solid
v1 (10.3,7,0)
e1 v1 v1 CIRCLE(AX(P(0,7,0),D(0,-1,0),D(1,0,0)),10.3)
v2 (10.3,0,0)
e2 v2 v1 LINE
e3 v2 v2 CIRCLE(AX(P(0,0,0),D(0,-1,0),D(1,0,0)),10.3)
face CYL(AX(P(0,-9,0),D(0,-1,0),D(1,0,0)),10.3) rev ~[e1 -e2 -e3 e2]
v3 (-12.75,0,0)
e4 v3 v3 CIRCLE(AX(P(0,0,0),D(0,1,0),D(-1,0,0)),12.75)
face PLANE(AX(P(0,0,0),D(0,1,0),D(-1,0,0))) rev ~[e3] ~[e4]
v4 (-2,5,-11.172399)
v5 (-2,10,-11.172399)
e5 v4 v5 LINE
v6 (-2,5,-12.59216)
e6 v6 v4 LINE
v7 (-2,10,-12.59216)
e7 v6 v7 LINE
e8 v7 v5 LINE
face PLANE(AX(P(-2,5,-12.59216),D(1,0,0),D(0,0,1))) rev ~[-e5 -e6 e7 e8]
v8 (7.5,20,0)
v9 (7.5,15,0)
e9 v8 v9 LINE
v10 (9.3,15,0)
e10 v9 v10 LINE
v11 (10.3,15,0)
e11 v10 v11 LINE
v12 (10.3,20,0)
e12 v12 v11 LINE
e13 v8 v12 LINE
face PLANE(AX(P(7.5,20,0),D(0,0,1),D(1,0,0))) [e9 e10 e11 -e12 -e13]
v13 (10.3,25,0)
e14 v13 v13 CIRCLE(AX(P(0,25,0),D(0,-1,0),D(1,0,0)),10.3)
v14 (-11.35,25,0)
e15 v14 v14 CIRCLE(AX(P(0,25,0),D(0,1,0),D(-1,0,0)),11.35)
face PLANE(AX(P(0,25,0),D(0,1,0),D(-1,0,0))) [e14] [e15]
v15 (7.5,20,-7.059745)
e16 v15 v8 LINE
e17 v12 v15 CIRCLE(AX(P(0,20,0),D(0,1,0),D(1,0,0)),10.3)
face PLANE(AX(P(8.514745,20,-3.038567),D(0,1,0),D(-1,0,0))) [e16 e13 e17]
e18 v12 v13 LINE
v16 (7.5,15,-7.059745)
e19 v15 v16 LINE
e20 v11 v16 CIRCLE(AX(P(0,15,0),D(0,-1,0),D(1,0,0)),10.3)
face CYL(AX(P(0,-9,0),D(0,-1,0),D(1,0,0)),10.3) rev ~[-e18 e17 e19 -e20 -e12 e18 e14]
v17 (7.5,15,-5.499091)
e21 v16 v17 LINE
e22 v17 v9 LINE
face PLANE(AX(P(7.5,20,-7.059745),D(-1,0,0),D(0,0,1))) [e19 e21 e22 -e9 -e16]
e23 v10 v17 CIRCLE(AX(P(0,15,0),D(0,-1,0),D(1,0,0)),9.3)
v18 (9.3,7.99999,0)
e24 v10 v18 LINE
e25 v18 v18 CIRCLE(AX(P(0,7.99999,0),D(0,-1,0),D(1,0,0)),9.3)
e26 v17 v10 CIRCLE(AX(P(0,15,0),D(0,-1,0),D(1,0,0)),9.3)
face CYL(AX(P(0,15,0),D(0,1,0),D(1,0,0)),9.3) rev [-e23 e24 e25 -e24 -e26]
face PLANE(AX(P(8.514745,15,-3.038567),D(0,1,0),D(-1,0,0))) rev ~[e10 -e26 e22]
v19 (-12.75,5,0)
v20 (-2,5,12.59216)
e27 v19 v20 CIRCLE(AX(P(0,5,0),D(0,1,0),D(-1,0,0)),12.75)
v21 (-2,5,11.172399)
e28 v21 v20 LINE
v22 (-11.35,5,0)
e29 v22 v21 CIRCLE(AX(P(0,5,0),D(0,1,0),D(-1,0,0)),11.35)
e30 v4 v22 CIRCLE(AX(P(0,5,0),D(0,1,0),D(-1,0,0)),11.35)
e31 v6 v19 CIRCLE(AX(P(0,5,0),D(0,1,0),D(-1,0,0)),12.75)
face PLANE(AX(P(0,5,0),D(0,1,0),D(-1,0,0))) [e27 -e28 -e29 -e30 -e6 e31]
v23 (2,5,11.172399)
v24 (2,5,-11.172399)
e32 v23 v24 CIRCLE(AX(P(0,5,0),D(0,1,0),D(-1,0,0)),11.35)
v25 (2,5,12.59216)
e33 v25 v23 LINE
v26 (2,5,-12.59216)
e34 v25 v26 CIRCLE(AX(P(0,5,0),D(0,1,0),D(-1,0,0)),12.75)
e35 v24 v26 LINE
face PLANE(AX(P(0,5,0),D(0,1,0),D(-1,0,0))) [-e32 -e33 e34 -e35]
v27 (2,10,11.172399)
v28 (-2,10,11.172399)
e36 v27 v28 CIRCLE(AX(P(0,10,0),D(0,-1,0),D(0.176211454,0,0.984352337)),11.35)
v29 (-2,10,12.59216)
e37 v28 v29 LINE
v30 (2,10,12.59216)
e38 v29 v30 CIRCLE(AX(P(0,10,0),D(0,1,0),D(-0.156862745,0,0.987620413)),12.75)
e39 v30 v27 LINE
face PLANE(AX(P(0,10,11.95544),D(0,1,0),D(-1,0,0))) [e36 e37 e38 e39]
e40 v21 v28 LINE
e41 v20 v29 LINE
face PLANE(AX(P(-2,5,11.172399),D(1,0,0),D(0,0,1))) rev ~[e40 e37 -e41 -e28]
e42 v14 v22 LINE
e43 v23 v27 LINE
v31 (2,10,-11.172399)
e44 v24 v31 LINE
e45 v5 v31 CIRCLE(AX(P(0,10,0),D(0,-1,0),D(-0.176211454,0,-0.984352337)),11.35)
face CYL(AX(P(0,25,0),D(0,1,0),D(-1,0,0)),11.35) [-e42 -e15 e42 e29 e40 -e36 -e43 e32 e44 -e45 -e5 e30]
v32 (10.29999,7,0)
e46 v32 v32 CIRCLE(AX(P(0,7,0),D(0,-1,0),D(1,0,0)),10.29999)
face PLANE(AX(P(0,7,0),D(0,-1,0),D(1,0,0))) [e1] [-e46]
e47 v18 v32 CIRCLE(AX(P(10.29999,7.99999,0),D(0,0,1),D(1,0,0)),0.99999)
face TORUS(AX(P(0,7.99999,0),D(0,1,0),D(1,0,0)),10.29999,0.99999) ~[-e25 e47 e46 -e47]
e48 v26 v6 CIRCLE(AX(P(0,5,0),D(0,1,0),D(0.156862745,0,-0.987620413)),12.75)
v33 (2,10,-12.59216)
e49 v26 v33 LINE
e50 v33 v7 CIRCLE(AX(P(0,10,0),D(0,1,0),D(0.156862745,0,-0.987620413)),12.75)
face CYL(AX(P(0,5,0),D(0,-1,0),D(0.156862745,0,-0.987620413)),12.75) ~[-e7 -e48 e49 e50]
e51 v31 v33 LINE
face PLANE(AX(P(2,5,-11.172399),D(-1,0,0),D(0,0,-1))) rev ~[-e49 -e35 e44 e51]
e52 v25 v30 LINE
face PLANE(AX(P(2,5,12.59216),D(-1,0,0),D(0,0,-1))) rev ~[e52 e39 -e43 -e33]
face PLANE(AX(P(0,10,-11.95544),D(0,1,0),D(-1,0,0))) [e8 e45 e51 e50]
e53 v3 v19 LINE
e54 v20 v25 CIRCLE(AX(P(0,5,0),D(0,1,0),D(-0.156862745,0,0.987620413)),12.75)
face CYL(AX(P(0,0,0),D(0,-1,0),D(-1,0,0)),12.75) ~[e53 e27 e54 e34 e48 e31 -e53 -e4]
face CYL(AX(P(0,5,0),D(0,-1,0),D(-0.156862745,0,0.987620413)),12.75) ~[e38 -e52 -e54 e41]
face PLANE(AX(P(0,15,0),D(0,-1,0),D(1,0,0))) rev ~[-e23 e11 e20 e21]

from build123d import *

# Parameters (mm, degrees)
F0_R         = 10.3
F1_DEPTH     = 9
F3_R         = 3.1
F4_DEPTH     = 9.001
F6_DEPTH     = 1.8
F7_T4_ANGLE  = 359.64
F7_S5_R      = 3.1
F7_T6_DEPTH  = 5
F7_T10_ANGLE = 359.64
F7_S11_R     = 3.1
F7_T12_DEPTH = 5
F7_T16_ANGLE = 359.64
F7_S17_R     = 3.1
F7_T18_DEPTH = 5
F9_R         = 12.75
F10_DEPTH    = 25
F11_R        = 3.1
F12_DEPTH    = 34.0010001
F13_R        = 12.75
F13_R_2      = 11.35
F14_DEPTH    = 20
F16_DEPTH    = 5
F17_R        = 10.3
F18_DEPTH    = 34.0010001
F20_START    = -5
F20_DEPTH    = 5
F21_R        = 10.3
F21_R_2      = 9.3
F22_DEPTH    = 8
F23_R        = 0.99999


# Not quite as in the source:
# - a fillet or chamfer that OpenCascade refuses, or shapes differently, is made with other operations: its cross-section is extruded or revolved along the edge and cut away or added
# - a fillet or chamfer is up to 0.001 mm smaller than in the source, because OpenCascade refuses the exact size


with BuildPart() as f1:
    # F0 (on Front) → F1 (new body)
    with BuildSketch(Plane.XZ):
        Circle(F0_R)
    extrude(amount=F1_DEPTH)

    # F3 (on face) → F4 (cut, through all)
    with BuildSketch(Plane.XZ.offset(9)):
        Circle(F3_R)
    extrude(amount=-F4_DEPTH, mode=Mode.SUBTRACT)

    # F5 (on face) → F6 (cut)
    with BuildSketch(Plane.XZ.offset(9)):
        with BuildLine():
            ThreePointArc((-3.0819681678, 0.333874546), (-2.6846787517, 1.55), (-1.8301279224, 2.502125454))
            ThreePointArc((-1.8301279224, 2.502125454), (-6.4951905284, 3.75), (-3.0819681678, 0.333874546))
        make_face()
        with BuildLine():
            ThreePointArc((6.8301270189, 2.5), (4.331189746, 4.9999997741), (1.8301279224, 2.502125454))
            ThreePointArc((1.8301279224, 2.502125454), (2.6846787517, 1.55), (3.0819681678, 0.333874546))
            ThreePointArc((3.0819681678, 0.333874546), (5.5810472546, 0.3354680497), (6.8301270189, 2.5))
        make_face()
        with BuildLine():
            ThreePointArc((1.2518402454, -2.836), (0, -3.1), (-1.2518402454, -2.836))
            ThreePointArc((-1.2518402454, -2.836), (-1.2490795384, -7.1655946774), (2.5, -5))
            ThreePointArc((2.5, -5), (2.1655946774, -3.7509204616), (1.2518402454, -2.836))
        make_face()
    extrude(amount=-F6_DEPTH, mode=Mode.SUBTRACT)

    # F7: fillet of radius 1 on 3 edges, made by hand


with BuildPart() as f7_tool2:
    # F7_s3 → F7_t4 (revolve)
    with BuildSketch(Plane(origin=(0.0078111935, 0, 0.0136280797), x_dir=(0, 1, 0), z_dir=(-0.497276838, 0, -0.8675919239))):
        with BuildLine():
            ThreePointArc((-8.2, -2.499975326), (-7.4928932188, -2.7928685448), (-7.2, -3.499975326))
            Line((-7.2, -3.499975326), (-7.18, -3.499975326))
            Line((-7.18, -3.499975326), (-7.18, -2.479975326))
            Line((-7.18, -2.479975326), (-8.2, -2.479975326))
            Line((-8.2, -2.479975326), (-8.2, -2.499975326))
        make_face()
    revolve(axis=Axis((-4.3301270189, -7.2, 2.5), (0, -1, 0)), revolution_arc=F7_T4_ANGLE)

    # F7_s5 → F7_t6 (cut, symmetric)
    with BuildSketch(Plane.XZ.offset(7.7)):
        Circle(F7_S5_R)
    extrude(amount=F7_T6_DEPTH, both=True, mode=Mode.SUBTRACT)


with BuildPart() as f1_1:
    add(f1.part)

    # F7_t1: union F7_tool2
    add(f7_tool2.part)


with BuildPart() as f7_tool8:
    # F7_s9 → F7_t10 (revolve)
    with BuildSketch(Plane(origin=(0.0078966665, 0, -0.0135787318), x_dir=(0, 1, 0), z_dir=(-0.5027182272, 0, 0.8644503364))):
        with BuildLine():
            ThreePointArc((-8.2, -2.499975326), (-7.4928932188, -2.7928685448), (-7.2, -3.499975326))
            Line((-7.2, -3.499975326), (-7.18, -3.499975326))
            Line((-7.18, -3.499975326), (-7.18, -2.479975326))
            Line((-7.18, -2.479975326), (-8.2, -2.479975326))
            Line((-8.2, -2.479975326), (-8.2, -2.499975326))
        make_face()
    revolve(axis=Axis((4.3301270189, -7.2, 2.5), (0, -1, 0)), revolution_arc=F7_T10_ANGLE)

    # F7_s11 → F7_t12 (cut, symmetric)
    with BuildSketch(Plane.XZ.offset(7.7)):
        Circle(F7_S11_R)
    extrude(amount=F7_T12_DEPTH, both=True, mode=Mode.SUBTRACT)


with BuildPart() as f1_2:
    add(f1_1.part)

    # F7_t7: union F7_tool8
    add(f7_tool8.part)


with BuildPart() as f7_tool14:
    # F7_s15 → F7_t16 (revolve)
    with BuildSketch(Plane(origin=(-0.0157078599, 0, -4.93479e-05), x_dir=(0, 1, 0), z_dir=(0.9999950652, 0, 0.0031415875))):
        with BuildLine():
            ThreePointArc((-8.2, -2.499975326), (-7.4928932188, -2.7928685448), (-7.2, -3.499975326))
            Line((-7.2, -3.499975326), (-7.18, -3.499975326))
            Line((-7.18, -3.499975326), (-7.18, -2.479975326))
            Line((-7.18, -2.479975326), (-8.2, -2.479975326))
            Line((-8.2, -2.479975326), (-8.2, -2.499975326))
        make_face()
    revolve(axis=Axis((0, -7.2, -5), (0, -1, 0)), revolution_arc=F7_T16_ANGLE)

    # F7_s17 → F7_t18 (cut, symmetric)
    with BuildSketch(Plane.XZ.offset(7.7)):
        Circle(F7_S17_R)
    extrude(amount=F7_T18_DEPTH, both=True, mode=Mode.SUBTRACT)


with BuildPart() as f1_3:
    add(f1_2.part)

    # F7_t13: union F7_tool14
    add(f7_tool14.part)

    # F9 (on offset) → F10 (join)
    with BuildSketch(Plane(origin=(0, 0, 0), x_dir=(-1, 0, 0), z_dir=(0, 1, 0))):
        Circle(F9_R)
    extrude(amount=F10_DEPTH)

    # F11 (on face) → F12 (cut, through all)
    with BuildSketch(Plane(origin=(0, 25, 0), x_dir=(-1, 0, 0), z_dir=(0, 1, 0))):
        Circle(F11_R)
    extrude(amount=-F12_DEPTH, mode=Mode.SUBTRACT)

    # F13 (on face) → F14 (cut)
    with BuildSketch(Plane(origin=(0, 25, 0), x_dir=(-1, 0, 0), z_dir=(0, 1, 0))):
        Circle(F13_R)
        Circle(F13_R_2, mode=Mode.SUBTRACT)
    extrude(amount=-F14_DEPTH, mode=Mode.SUBTRACT)

    # F15 (on face) → F16 (join)
    with BuildSketch(Plane(origin=(0, 5, 0), x_dir=(-1, 0, 0), z_dir=(0, 1, 0))):
        with BuildLine():
            ThreePointArc((2, 12.5921602595), (0, 12.75), (-2, 12.5921602595))
            Line((-2, 12.5921602595), (-2, 11.1723990262))
            ThreePointArc((-2, 11.1723990262), (0, 11.35), (2, 11.1723990262))
            Line((2, 11.1723990262), (2, 12.5921602595))
        make_face()
        with BuildLine():
            ThreePointArc((2, -11.1723990262), (0, -11.35), (-2, -11.1723990262))
            Line((-2, -11.1723990262), (-2, -12.5921602595))
            ThreePointArc((-2, -12.5921602595), (0, -12.75), (2, -12.5921602595))
            Line((2, -12.5921602595), (2, -11.1723990262))
        make_face()
    extrude(amount=F16_DEPTH)

    # F17 (on face) → F18 (cut, through all)
    with BuildSketch(Plane.XZ.offset(9)):
        Circle(F17_R)
    extrude(amount=-F18_DEPTH, mode=Mode.SUBTRACT)

    # F19 (on face) → F20 (join)
    with BuildSketch(Plane(origin=(0, 25, 0), x_dir=(-1, 0, 0), z_dir=(0, 1, 0)).offset(F20_START)):
        with BuildLine():
            Line((-7.5, 0), (-10.3, 0))
            ThreePointArc((-10.3, 0), (-9.5744451536, -3.7973675092), (-7.5, -7.0597450379))
            Line((-7.5, -7.0597450379), (-7.5, 0))
        make_face()
    extrude(amount=-F20_DEPTH)

    # F21 (on face) → F22 (join)
    with BuildSketch(Plane.XZ.offset(-15)):
        Circle(F21_R)
        Circle(F21_R_2, mode=Mode.SUBTRACT)
    extrude(amount=F22_DEPTH)

    # F23 (radius 1 in the source; OpenCascade refuses exactly that, so slightly less here)
    f23_edges = [f1_3.edges().sort_by_distance(p)[0] for p in [
        (-9.3, 7, 0),
    ]]
    fillet(f23_edges, radius=F23_R)


solid = f1_3.part
